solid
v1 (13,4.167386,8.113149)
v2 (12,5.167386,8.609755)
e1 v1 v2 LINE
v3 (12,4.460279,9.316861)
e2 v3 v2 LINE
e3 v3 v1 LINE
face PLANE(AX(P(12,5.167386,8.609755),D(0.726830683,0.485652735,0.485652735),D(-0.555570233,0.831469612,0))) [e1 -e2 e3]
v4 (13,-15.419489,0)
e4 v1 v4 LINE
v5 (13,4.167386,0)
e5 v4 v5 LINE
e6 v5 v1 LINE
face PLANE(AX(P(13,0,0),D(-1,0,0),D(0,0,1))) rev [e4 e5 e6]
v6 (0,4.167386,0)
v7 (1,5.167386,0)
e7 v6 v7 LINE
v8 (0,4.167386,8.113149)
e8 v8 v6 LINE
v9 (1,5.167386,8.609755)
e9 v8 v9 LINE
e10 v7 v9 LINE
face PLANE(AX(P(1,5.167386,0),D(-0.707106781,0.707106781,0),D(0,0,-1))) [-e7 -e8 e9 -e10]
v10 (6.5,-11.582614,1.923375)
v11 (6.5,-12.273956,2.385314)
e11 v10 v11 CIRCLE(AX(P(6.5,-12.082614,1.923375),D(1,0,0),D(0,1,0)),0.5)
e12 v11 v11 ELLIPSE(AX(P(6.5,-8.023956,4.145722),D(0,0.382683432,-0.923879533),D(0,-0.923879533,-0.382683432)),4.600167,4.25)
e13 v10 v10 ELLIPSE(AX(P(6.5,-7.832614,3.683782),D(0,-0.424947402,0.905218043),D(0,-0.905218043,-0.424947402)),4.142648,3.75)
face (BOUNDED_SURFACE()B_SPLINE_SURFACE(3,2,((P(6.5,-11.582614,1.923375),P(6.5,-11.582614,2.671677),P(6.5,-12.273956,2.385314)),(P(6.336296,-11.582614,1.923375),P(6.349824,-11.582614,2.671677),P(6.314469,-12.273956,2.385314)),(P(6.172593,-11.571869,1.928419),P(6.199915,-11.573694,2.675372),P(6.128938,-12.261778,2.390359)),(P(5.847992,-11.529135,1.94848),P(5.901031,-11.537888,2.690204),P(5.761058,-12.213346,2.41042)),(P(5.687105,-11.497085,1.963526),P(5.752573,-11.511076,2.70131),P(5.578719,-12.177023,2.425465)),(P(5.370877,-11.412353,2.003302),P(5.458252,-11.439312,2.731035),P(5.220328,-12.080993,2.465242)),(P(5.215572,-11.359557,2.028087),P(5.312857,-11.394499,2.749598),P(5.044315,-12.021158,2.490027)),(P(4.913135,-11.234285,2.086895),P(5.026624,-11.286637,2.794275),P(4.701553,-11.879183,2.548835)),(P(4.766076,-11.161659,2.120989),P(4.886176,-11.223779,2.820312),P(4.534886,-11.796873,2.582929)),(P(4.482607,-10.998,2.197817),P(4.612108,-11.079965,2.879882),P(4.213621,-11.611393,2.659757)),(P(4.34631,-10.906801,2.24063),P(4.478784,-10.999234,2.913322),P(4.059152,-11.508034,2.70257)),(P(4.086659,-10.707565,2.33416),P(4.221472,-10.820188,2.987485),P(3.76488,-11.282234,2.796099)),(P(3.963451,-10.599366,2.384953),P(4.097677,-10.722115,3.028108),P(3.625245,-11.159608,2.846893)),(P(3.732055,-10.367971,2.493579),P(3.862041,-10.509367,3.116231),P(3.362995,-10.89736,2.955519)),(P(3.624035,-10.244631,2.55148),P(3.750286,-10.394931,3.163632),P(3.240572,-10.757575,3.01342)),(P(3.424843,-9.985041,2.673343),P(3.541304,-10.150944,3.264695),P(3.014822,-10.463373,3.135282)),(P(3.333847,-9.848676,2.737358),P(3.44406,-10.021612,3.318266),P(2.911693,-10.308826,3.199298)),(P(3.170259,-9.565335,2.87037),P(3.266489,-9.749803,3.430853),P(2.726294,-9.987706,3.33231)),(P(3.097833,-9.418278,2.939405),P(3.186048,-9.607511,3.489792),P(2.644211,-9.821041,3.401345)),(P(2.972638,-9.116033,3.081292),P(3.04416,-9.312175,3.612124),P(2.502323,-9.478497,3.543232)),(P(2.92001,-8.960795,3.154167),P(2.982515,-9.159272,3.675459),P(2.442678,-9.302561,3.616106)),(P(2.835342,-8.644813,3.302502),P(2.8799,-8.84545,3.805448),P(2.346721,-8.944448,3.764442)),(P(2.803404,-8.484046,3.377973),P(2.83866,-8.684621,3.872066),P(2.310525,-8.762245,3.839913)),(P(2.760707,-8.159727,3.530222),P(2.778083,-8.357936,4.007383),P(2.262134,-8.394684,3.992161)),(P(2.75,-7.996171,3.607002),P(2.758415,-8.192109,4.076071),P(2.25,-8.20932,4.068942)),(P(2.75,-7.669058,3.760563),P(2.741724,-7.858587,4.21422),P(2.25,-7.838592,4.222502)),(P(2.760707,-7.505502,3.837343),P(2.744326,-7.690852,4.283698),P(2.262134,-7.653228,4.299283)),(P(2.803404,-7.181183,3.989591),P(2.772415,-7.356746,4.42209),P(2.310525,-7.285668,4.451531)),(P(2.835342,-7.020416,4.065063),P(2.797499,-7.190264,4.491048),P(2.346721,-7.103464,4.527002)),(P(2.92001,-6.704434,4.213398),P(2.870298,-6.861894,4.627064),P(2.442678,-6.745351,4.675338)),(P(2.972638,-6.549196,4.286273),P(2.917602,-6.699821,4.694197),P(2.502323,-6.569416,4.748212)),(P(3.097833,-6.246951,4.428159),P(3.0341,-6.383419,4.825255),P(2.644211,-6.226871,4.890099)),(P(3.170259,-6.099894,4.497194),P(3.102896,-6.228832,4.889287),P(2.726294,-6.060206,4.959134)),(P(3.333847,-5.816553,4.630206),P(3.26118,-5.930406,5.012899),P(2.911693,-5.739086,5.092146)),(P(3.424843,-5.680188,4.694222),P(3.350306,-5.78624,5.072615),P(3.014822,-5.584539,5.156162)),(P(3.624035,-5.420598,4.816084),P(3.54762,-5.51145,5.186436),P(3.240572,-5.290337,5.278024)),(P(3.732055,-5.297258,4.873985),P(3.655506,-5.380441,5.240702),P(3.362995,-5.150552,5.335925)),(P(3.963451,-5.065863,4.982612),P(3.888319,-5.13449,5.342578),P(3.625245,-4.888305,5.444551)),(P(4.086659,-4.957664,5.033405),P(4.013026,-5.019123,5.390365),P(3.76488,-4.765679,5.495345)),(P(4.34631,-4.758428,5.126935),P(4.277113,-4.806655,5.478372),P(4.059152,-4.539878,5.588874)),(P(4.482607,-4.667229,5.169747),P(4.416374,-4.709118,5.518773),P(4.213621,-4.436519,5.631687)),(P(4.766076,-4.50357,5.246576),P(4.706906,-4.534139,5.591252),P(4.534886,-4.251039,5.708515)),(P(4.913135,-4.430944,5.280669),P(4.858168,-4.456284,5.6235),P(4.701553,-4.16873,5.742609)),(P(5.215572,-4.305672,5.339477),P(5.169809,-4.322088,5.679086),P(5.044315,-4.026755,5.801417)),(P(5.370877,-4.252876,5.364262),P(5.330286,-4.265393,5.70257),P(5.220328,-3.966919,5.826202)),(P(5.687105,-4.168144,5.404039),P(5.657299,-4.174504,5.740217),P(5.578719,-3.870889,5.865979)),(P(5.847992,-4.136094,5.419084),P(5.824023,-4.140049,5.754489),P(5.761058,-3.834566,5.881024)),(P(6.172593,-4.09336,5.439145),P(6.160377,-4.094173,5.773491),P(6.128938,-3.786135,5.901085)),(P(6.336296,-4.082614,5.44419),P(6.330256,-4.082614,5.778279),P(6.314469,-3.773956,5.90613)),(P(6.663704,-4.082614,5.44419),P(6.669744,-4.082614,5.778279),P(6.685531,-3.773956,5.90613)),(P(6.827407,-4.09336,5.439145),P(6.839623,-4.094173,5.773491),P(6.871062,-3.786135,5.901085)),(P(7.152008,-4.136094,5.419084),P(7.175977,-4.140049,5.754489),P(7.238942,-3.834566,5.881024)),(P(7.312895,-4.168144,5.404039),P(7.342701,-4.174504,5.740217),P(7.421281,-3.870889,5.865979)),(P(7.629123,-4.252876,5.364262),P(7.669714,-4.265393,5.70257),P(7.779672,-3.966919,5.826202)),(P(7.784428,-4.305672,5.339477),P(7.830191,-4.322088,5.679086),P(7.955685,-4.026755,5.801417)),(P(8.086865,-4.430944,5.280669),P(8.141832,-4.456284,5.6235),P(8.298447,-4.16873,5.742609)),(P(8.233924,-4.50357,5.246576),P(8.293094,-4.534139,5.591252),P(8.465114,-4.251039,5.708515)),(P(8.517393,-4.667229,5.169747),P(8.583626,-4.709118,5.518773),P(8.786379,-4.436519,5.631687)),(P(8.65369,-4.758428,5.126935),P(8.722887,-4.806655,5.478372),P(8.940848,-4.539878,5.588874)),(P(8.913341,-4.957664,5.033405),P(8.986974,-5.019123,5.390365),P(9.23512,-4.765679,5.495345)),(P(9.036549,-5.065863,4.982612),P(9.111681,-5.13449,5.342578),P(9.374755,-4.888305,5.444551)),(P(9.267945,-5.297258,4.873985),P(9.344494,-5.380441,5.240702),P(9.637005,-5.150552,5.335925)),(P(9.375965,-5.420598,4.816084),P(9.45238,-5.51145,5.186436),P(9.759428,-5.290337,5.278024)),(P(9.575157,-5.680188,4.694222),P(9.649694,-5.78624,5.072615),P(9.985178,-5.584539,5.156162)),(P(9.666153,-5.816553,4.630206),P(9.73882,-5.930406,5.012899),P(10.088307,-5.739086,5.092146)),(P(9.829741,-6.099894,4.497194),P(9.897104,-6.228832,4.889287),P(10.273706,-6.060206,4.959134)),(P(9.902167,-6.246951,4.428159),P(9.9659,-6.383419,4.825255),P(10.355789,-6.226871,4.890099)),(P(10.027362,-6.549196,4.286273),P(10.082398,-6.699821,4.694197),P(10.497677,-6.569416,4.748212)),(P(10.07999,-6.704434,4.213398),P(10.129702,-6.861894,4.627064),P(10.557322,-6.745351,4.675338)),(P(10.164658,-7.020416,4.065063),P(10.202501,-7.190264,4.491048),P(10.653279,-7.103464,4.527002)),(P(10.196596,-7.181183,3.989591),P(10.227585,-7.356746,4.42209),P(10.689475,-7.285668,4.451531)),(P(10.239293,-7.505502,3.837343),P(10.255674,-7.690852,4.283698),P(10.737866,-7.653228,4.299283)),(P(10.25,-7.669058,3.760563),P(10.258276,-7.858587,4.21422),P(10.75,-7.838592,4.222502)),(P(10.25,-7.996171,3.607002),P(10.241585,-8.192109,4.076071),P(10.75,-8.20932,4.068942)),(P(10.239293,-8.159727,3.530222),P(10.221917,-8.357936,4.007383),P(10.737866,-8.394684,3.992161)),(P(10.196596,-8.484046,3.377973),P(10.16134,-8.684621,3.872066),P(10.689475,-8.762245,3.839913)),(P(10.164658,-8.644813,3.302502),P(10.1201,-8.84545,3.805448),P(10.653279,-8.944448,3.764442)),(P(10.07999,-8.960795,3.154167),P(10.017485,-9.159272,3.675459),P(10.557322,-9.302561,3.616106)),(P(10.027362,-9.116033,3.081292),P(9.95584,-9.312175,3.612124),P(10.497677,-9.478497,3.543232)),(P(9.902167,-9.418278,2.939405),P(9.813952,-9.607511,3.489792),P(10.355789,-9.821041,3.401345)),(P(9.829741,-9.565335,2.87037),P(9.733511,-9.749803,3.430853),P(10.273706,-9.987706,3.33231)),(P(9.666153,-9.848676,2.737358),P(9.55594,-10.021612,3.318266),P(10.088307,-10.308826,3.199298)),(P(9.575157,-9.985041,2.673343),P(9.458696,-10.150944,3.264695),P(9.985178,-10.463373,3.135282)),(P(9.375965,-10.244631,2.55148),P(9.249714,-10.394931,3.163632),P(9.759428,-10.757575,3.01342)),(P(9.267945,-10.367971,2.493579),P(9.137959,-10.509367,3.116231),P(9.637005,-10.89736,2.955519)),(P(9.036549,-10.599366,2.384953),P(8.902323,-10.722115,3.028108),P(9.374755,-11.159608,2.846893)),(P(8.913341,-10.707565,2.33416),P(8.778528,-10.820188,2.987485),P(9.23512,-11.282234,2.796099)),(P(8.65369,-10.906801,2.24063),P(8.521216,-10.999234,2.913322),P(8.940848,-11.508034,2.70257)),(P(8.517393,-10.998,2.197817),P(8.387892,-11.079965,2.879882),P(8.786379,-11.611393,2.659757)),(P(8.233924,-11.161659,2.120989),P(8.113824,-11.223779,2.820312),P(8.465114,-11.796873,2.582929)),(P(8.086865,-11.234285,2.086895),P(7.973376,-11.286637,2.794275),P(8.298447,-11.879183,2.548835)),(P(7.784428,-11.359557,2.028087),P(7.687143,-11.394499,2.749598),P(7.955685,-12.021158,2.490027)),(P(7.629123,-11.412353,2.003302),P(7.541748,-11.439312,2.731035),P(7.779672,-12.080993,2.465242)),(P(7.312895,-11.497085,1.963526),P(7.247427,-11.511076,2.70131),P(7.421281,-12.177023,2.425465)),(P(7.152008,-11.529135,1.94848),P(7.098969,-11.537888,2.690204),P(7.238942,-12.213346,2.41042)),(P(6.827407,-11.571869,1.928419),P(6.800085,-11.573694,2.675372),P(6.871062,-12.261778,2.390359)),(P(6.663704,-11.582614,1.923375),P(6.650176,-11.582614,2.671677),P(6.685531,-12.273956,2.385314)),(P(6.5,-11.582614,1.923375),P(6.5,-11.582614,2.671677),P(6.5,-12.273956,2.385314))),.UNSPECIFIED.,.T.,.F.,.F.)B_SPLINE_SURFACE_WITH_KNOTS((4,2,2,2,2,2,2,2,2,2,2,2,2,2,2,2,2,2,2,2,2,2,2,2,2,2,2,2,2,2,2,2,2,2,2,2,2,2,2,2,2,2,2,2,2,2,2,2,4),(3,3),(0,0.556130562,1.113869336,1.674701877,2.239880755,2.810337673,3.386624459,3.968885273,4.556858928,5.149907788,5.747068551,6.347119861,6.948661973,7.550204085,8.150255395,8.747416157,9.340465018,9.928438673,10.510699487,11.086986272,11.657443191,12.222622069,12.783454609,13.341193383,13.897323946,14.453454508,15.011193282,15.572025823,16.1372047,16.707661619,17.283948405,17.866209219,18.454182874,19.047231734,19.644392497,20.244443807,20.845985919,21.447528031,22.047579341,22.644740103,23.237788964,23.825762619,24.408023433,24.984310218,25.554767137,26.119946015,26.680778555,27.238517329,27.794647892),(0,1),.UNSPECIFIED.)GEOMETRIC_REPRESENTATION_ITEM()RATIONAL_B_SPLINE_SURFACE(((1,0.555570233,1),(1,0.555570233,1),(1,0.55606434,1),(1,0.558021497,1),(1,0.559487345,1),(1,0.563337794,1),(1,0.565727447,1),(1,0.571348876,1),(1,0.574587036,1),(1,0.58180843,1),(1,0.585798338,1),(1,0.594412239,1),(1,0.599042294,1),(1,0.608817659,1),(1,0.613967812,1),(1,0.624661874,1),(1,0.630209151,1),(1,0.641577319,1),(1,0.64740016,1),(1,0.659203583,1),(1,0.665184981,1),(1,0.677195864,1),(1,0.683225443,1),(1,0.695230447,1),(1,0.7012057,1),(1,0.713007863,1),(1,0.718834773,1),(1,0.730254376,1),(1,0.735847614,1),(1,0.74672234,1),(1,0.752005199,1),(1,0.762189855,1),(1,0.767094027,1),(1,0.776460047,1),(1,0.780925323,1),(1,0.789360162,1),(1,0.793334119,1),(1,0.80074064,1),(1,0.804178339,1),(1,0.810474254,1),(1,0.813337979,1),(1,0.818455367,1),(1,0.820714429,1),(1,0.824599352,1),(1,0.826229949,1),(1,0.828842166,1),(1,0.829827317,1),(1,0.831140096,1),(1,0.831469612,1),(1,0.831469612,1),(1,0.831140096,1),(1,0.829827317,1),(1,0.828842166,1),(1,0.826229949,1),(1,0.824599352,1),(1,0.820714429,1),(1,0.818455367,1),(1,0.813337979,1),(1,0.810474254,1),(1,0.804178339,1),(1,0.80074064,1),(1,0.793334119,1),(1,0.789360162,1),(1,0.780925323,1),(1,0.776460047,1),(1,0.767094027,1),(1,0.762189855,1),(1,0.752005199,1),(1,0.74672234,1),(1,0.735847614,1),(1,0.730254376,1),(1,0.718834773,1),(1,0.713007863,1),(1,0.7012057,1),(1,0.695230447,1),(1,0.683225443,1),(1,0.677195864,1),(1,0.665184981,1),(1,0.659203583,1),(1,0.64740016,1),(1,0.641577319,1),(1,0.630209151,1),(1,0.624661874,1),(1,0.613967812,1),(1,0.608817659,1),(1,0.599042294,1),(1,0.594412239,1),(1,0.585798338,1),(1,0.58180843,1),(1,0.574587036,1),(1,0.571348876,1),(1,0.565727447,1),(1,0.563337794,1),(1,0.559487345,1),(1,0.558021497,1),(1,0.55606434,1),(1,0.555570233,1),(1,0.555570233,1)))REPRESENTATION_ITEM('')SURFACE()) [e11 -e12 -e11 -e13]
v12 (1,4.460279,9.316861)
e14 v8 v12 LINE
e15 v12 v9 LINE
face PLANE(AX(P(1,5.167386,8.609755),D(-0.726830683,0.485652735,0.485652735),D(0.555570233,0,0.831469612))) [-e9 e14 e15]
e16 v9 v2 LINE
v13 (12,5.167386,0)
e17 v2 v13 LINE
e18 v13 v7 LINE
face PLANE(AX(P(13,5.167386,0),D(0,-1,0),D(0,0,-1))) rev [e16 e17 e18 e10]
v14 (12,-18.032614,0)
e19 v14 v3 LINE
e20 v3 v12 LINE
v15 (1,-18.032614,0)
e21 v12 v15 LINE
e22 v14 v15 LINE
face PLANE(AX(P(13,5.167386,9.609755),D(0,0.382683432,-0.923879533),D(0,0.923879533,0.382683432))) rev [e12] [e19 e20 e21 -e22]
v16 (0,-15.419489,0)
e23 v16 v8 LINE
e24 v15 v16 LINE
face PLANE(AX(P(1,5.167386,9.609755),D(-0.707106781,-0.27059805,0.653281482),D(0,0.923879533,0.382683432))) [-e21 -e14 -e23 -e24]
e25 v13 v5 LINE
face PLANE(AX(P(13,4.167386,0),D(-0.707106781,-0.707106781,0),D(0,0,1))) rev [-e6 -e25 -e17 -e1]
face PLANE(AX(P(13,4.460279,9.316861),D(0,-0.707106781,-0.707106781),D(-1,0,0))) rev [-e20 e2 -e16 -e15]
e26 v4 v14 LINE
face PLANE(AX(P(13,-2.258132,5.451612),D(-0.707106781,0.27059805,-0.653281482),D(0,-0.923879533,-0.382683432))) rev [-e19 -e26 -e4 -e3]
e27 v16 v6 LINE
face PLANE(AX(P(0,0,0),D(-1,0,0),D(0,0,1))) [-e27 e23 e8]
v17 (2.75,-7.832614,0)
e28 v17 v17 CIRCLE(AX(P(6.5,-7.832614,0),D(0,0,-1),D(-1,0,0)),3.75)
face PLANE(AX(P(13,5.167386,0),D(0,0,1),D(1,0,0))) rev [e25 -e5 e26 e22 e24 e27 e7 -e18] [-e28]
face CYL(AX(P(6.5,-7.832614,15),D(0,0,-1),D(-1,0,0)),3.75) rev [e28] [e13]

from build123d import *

# Parameters (mm, degrees)
RESSALTO_EXTRUS_O1_DEPTH = 13
ESBO_O3_R                = 3.75
CORTE_EXTRUS_O1_DEPTH    = 15
FILETE1_R                = 0.5


with BuildPart() as part:
    # Esboço2 → Ressalto-extrusão1 (new body)
    with BuildSketch(Plane(origin=(0, 0, 0), x_dir=(0, 0, -1), z_dir=(1, 0, 0))):
        Polygon((0, 5.167385512), (0, -18.032614488), (-9.609754647, 5.167385512), align=None)
    extrude(amount=RESSALTO_EXTRUS_O1_DEPTH)

    # Esboço3 → Corte-extrusão1 (cut)
    with BuildSketch(Plane(origin=(0, 0, 0), x_dir=(-1, 0, 0), z_dir=(0, 0, -1))):
        with Locations((-6.5, -7.832614488)):
            Circle(ESBO_O3_R)
    extrude(amount=-CORTE_EXTRUS_O1_DEPTH, mode=Mode.SUBTRACT)

    # Chanfro1
    # the kernel refuses this chamfer: 1, 0.765366865 mm, written as the material it takes off along each edge
    with BuildSketch(Plane(origin=(12.333333333, 4.598349918, 8.679921653), x_dir=(0.6671683756339832, -0.6671683756339838, -0.3313196600080107), z_dir=(0.7268306825413349, 0.4856527354584224, 0.485652735458423))) as chanfro1_piece_1:
        Polygon((-0.578784303, 0.323797402), (0.920087701, 0.323797402), (-0.341303398, -0.647594805), align=None)
    extrude(amount=1.33373176, mode=Mode.SUBTRACT)
    with BuildSketch(Plane(origin=(0.666666667, 4.598349918, 8.679921653), x_dir=(-0.6671683756339831, -0.6671683756339838, -0.3313196600080107), z_dir=(-0.7268306825413349, 0.48565273545842236, 0.485652735458423))) as chanfro1_piece_2:
        Polygon((-0.578784303, -0.323797402), (0.920087701, -0.323797402), (-0.341303398, 0.647594805), align=None)
    extrude(amount=1.33373176, mode=Mode.SUBTRACT)
    with BuildSketch(Plane(origin=(13, 5.167385512, 12.181437635), x_dir=(-0.9996219169112968, 0.02749587661058651, 0), z_dir=(0, 0, -1))) as chanfro1_piece_3:
        with BuildLine():
            Line((1.028673195, 0), (-0.056547155, -1.027117794))
            Line((-0.056547155, -1.027117794), (-0.076539593, -1.026567876))
            ThreePointArc((-0.076539593, -1.026567876), (-0.034129227, -0.51339783), (-0.019992438, 0.000549918))
            Line((-0.019992438, 0.000549918), (0.000549918, 0.019992438))
            ThreePointArc((0.000549918, 0.019992438), (0.514497665, 0.00585565), (1.029223113, 0.019992438))
            Line((1.029223113, 0.019992438), (1.028673195, 0))
        make_face()
    extrude(amount=14.753120623, mode=Mode.SUBTRACT)
    with BuildSketch(Plane(origin=(0, 5.167385512, 12.181437635), x_dir=(0.9996219169112968, 0.027495876610586494, 0), z_dir=(0, 0, -1))) as chanfro1_piece_4:
        with BuildLine():
            Line((1.028673195, 0), (-0.056547155, 1.027117794))
            Line((-0.056547155, 1.027117794), (-0.076539593, 1.026567876))
            ThreePointArc((-0.076539593, 1.026567876), (-0.034129227, 0.51339783), (-0.019992438, -0.000549918))
            Line((-0.019992438, -0.000549918), (0.000549918, -0.019992438))
            ThreePointArc((0.000549918, -0.019992438), (0.514497665, -0.00585565), (1.029223113, -0.019992438))
            Line((1.029223113, -0.019992438), (1.028673195, 0))
        make_face()
    extrude(amount=14.753120623, mode=Mode.SUBTRACT)
    with BuildSketch(Plane(origin=(0, -20.408539765, -0.984140473), x_dir=(-0.027495876610586358, 0.3825387462309866, -0.9235302292840447), z_dir=(0, 0.9238795325112864, 0.3826834323650908))) as chanfro1_piece_5:
        with BuildLine():
            Line((1.028673195, 0), (-0.056547155, -1.027117794))
            Line((-0.056547155, -1.027117794), (-0.076539593, -1.026567876))
            ThreePointArc((-0.076539593, -1.026567876), (-0.034129227, -0.51339783), (-0.019992438, 0.000549918))
            Line((-0.019992438, 0.000549918), (0.000549918, 0.019992438))
            ThreePointArc((0.000549918, 0.019992438), (0.514497665, 0.00585565), (1.029223113, 0.019992438))
            Line((1.029223113, 0.019992438), (1.028673195, 0))
        make_face()
    extrude(amount=30.254865023, mode=Mode.SUBTRACT)
    with BuildSketch(Plane(origin=(13, -20.408539765, -0.984140473), x_dir=(0.027495876610585605, 0.38253874623098666, -0.9235302292840448), z_dir=(0, 0.9238795325112864, 0.3826834323650908))) as chanfro1_piece_6:
        with BuildLine():
            Line((1.028673195, 0), (-0.056547155, 1.027117794))
            Line((-0.056547155, 1.027117794), (-0.076539593, 1.026567876))
            ThreePointArc((-0.076539593, 1.026567876), (-0.034129227, 0.51339783), (-0.019992438, -0.000549918))
            Line((-0.019992438, -0.000549918), (0.000549918, -0.019992438))
            ThreePointArc((0.000549918, -0.019992438), (0.514497665, -0.00585565), (1.029223113, -0.019992438))
            Line((1.029223113, -0.019992438), (1.028673195, 0))
        make_face()
    extrude(amount=30.254865023, mode=Mode.SUBTRACT)
    with BuildSketch(Plane(origin=(-2.571682988, 5.167385512, 9.609754647), x_dir=(0, 0.02749587661058651, -0.9996219169112968), z_dir=(1, 0, 0))) as chanfro1_piece_7:
        with BuildLine():
            Line((1.028673195, 0), (0.244288682, -0.742388668))
            Line((0.244288682, -0.742388668), (0.225607633, -0.749531386))
            ThreePointArc((0.225607633, -0.749531386), (0.120722331, -0.371738041), (-0.018681049, -0.007142717))
            Line((-0.018681049, -0.007142717), (0.000549918, 0.019992438))
            ThreePointArc((0.000549918, 0.019992438), (0.514497665, 0.00585565), (1.029223113, 0.019992438))
            Line((1.029223113, 0.019992438), (1.028673195, 0))
        make_face()
    extrude(amount=18.143365976, mode=Mode.SUBTRACT)

    # Filete1
    filete1_edges = [part.edges().sort_by_distance(p)[0] for p in [
        (10.25, -7.832628458, 4.22497255),
    ]]
    fillet(filete1_edges, radius=FILETE1_R)


solid = part.part
